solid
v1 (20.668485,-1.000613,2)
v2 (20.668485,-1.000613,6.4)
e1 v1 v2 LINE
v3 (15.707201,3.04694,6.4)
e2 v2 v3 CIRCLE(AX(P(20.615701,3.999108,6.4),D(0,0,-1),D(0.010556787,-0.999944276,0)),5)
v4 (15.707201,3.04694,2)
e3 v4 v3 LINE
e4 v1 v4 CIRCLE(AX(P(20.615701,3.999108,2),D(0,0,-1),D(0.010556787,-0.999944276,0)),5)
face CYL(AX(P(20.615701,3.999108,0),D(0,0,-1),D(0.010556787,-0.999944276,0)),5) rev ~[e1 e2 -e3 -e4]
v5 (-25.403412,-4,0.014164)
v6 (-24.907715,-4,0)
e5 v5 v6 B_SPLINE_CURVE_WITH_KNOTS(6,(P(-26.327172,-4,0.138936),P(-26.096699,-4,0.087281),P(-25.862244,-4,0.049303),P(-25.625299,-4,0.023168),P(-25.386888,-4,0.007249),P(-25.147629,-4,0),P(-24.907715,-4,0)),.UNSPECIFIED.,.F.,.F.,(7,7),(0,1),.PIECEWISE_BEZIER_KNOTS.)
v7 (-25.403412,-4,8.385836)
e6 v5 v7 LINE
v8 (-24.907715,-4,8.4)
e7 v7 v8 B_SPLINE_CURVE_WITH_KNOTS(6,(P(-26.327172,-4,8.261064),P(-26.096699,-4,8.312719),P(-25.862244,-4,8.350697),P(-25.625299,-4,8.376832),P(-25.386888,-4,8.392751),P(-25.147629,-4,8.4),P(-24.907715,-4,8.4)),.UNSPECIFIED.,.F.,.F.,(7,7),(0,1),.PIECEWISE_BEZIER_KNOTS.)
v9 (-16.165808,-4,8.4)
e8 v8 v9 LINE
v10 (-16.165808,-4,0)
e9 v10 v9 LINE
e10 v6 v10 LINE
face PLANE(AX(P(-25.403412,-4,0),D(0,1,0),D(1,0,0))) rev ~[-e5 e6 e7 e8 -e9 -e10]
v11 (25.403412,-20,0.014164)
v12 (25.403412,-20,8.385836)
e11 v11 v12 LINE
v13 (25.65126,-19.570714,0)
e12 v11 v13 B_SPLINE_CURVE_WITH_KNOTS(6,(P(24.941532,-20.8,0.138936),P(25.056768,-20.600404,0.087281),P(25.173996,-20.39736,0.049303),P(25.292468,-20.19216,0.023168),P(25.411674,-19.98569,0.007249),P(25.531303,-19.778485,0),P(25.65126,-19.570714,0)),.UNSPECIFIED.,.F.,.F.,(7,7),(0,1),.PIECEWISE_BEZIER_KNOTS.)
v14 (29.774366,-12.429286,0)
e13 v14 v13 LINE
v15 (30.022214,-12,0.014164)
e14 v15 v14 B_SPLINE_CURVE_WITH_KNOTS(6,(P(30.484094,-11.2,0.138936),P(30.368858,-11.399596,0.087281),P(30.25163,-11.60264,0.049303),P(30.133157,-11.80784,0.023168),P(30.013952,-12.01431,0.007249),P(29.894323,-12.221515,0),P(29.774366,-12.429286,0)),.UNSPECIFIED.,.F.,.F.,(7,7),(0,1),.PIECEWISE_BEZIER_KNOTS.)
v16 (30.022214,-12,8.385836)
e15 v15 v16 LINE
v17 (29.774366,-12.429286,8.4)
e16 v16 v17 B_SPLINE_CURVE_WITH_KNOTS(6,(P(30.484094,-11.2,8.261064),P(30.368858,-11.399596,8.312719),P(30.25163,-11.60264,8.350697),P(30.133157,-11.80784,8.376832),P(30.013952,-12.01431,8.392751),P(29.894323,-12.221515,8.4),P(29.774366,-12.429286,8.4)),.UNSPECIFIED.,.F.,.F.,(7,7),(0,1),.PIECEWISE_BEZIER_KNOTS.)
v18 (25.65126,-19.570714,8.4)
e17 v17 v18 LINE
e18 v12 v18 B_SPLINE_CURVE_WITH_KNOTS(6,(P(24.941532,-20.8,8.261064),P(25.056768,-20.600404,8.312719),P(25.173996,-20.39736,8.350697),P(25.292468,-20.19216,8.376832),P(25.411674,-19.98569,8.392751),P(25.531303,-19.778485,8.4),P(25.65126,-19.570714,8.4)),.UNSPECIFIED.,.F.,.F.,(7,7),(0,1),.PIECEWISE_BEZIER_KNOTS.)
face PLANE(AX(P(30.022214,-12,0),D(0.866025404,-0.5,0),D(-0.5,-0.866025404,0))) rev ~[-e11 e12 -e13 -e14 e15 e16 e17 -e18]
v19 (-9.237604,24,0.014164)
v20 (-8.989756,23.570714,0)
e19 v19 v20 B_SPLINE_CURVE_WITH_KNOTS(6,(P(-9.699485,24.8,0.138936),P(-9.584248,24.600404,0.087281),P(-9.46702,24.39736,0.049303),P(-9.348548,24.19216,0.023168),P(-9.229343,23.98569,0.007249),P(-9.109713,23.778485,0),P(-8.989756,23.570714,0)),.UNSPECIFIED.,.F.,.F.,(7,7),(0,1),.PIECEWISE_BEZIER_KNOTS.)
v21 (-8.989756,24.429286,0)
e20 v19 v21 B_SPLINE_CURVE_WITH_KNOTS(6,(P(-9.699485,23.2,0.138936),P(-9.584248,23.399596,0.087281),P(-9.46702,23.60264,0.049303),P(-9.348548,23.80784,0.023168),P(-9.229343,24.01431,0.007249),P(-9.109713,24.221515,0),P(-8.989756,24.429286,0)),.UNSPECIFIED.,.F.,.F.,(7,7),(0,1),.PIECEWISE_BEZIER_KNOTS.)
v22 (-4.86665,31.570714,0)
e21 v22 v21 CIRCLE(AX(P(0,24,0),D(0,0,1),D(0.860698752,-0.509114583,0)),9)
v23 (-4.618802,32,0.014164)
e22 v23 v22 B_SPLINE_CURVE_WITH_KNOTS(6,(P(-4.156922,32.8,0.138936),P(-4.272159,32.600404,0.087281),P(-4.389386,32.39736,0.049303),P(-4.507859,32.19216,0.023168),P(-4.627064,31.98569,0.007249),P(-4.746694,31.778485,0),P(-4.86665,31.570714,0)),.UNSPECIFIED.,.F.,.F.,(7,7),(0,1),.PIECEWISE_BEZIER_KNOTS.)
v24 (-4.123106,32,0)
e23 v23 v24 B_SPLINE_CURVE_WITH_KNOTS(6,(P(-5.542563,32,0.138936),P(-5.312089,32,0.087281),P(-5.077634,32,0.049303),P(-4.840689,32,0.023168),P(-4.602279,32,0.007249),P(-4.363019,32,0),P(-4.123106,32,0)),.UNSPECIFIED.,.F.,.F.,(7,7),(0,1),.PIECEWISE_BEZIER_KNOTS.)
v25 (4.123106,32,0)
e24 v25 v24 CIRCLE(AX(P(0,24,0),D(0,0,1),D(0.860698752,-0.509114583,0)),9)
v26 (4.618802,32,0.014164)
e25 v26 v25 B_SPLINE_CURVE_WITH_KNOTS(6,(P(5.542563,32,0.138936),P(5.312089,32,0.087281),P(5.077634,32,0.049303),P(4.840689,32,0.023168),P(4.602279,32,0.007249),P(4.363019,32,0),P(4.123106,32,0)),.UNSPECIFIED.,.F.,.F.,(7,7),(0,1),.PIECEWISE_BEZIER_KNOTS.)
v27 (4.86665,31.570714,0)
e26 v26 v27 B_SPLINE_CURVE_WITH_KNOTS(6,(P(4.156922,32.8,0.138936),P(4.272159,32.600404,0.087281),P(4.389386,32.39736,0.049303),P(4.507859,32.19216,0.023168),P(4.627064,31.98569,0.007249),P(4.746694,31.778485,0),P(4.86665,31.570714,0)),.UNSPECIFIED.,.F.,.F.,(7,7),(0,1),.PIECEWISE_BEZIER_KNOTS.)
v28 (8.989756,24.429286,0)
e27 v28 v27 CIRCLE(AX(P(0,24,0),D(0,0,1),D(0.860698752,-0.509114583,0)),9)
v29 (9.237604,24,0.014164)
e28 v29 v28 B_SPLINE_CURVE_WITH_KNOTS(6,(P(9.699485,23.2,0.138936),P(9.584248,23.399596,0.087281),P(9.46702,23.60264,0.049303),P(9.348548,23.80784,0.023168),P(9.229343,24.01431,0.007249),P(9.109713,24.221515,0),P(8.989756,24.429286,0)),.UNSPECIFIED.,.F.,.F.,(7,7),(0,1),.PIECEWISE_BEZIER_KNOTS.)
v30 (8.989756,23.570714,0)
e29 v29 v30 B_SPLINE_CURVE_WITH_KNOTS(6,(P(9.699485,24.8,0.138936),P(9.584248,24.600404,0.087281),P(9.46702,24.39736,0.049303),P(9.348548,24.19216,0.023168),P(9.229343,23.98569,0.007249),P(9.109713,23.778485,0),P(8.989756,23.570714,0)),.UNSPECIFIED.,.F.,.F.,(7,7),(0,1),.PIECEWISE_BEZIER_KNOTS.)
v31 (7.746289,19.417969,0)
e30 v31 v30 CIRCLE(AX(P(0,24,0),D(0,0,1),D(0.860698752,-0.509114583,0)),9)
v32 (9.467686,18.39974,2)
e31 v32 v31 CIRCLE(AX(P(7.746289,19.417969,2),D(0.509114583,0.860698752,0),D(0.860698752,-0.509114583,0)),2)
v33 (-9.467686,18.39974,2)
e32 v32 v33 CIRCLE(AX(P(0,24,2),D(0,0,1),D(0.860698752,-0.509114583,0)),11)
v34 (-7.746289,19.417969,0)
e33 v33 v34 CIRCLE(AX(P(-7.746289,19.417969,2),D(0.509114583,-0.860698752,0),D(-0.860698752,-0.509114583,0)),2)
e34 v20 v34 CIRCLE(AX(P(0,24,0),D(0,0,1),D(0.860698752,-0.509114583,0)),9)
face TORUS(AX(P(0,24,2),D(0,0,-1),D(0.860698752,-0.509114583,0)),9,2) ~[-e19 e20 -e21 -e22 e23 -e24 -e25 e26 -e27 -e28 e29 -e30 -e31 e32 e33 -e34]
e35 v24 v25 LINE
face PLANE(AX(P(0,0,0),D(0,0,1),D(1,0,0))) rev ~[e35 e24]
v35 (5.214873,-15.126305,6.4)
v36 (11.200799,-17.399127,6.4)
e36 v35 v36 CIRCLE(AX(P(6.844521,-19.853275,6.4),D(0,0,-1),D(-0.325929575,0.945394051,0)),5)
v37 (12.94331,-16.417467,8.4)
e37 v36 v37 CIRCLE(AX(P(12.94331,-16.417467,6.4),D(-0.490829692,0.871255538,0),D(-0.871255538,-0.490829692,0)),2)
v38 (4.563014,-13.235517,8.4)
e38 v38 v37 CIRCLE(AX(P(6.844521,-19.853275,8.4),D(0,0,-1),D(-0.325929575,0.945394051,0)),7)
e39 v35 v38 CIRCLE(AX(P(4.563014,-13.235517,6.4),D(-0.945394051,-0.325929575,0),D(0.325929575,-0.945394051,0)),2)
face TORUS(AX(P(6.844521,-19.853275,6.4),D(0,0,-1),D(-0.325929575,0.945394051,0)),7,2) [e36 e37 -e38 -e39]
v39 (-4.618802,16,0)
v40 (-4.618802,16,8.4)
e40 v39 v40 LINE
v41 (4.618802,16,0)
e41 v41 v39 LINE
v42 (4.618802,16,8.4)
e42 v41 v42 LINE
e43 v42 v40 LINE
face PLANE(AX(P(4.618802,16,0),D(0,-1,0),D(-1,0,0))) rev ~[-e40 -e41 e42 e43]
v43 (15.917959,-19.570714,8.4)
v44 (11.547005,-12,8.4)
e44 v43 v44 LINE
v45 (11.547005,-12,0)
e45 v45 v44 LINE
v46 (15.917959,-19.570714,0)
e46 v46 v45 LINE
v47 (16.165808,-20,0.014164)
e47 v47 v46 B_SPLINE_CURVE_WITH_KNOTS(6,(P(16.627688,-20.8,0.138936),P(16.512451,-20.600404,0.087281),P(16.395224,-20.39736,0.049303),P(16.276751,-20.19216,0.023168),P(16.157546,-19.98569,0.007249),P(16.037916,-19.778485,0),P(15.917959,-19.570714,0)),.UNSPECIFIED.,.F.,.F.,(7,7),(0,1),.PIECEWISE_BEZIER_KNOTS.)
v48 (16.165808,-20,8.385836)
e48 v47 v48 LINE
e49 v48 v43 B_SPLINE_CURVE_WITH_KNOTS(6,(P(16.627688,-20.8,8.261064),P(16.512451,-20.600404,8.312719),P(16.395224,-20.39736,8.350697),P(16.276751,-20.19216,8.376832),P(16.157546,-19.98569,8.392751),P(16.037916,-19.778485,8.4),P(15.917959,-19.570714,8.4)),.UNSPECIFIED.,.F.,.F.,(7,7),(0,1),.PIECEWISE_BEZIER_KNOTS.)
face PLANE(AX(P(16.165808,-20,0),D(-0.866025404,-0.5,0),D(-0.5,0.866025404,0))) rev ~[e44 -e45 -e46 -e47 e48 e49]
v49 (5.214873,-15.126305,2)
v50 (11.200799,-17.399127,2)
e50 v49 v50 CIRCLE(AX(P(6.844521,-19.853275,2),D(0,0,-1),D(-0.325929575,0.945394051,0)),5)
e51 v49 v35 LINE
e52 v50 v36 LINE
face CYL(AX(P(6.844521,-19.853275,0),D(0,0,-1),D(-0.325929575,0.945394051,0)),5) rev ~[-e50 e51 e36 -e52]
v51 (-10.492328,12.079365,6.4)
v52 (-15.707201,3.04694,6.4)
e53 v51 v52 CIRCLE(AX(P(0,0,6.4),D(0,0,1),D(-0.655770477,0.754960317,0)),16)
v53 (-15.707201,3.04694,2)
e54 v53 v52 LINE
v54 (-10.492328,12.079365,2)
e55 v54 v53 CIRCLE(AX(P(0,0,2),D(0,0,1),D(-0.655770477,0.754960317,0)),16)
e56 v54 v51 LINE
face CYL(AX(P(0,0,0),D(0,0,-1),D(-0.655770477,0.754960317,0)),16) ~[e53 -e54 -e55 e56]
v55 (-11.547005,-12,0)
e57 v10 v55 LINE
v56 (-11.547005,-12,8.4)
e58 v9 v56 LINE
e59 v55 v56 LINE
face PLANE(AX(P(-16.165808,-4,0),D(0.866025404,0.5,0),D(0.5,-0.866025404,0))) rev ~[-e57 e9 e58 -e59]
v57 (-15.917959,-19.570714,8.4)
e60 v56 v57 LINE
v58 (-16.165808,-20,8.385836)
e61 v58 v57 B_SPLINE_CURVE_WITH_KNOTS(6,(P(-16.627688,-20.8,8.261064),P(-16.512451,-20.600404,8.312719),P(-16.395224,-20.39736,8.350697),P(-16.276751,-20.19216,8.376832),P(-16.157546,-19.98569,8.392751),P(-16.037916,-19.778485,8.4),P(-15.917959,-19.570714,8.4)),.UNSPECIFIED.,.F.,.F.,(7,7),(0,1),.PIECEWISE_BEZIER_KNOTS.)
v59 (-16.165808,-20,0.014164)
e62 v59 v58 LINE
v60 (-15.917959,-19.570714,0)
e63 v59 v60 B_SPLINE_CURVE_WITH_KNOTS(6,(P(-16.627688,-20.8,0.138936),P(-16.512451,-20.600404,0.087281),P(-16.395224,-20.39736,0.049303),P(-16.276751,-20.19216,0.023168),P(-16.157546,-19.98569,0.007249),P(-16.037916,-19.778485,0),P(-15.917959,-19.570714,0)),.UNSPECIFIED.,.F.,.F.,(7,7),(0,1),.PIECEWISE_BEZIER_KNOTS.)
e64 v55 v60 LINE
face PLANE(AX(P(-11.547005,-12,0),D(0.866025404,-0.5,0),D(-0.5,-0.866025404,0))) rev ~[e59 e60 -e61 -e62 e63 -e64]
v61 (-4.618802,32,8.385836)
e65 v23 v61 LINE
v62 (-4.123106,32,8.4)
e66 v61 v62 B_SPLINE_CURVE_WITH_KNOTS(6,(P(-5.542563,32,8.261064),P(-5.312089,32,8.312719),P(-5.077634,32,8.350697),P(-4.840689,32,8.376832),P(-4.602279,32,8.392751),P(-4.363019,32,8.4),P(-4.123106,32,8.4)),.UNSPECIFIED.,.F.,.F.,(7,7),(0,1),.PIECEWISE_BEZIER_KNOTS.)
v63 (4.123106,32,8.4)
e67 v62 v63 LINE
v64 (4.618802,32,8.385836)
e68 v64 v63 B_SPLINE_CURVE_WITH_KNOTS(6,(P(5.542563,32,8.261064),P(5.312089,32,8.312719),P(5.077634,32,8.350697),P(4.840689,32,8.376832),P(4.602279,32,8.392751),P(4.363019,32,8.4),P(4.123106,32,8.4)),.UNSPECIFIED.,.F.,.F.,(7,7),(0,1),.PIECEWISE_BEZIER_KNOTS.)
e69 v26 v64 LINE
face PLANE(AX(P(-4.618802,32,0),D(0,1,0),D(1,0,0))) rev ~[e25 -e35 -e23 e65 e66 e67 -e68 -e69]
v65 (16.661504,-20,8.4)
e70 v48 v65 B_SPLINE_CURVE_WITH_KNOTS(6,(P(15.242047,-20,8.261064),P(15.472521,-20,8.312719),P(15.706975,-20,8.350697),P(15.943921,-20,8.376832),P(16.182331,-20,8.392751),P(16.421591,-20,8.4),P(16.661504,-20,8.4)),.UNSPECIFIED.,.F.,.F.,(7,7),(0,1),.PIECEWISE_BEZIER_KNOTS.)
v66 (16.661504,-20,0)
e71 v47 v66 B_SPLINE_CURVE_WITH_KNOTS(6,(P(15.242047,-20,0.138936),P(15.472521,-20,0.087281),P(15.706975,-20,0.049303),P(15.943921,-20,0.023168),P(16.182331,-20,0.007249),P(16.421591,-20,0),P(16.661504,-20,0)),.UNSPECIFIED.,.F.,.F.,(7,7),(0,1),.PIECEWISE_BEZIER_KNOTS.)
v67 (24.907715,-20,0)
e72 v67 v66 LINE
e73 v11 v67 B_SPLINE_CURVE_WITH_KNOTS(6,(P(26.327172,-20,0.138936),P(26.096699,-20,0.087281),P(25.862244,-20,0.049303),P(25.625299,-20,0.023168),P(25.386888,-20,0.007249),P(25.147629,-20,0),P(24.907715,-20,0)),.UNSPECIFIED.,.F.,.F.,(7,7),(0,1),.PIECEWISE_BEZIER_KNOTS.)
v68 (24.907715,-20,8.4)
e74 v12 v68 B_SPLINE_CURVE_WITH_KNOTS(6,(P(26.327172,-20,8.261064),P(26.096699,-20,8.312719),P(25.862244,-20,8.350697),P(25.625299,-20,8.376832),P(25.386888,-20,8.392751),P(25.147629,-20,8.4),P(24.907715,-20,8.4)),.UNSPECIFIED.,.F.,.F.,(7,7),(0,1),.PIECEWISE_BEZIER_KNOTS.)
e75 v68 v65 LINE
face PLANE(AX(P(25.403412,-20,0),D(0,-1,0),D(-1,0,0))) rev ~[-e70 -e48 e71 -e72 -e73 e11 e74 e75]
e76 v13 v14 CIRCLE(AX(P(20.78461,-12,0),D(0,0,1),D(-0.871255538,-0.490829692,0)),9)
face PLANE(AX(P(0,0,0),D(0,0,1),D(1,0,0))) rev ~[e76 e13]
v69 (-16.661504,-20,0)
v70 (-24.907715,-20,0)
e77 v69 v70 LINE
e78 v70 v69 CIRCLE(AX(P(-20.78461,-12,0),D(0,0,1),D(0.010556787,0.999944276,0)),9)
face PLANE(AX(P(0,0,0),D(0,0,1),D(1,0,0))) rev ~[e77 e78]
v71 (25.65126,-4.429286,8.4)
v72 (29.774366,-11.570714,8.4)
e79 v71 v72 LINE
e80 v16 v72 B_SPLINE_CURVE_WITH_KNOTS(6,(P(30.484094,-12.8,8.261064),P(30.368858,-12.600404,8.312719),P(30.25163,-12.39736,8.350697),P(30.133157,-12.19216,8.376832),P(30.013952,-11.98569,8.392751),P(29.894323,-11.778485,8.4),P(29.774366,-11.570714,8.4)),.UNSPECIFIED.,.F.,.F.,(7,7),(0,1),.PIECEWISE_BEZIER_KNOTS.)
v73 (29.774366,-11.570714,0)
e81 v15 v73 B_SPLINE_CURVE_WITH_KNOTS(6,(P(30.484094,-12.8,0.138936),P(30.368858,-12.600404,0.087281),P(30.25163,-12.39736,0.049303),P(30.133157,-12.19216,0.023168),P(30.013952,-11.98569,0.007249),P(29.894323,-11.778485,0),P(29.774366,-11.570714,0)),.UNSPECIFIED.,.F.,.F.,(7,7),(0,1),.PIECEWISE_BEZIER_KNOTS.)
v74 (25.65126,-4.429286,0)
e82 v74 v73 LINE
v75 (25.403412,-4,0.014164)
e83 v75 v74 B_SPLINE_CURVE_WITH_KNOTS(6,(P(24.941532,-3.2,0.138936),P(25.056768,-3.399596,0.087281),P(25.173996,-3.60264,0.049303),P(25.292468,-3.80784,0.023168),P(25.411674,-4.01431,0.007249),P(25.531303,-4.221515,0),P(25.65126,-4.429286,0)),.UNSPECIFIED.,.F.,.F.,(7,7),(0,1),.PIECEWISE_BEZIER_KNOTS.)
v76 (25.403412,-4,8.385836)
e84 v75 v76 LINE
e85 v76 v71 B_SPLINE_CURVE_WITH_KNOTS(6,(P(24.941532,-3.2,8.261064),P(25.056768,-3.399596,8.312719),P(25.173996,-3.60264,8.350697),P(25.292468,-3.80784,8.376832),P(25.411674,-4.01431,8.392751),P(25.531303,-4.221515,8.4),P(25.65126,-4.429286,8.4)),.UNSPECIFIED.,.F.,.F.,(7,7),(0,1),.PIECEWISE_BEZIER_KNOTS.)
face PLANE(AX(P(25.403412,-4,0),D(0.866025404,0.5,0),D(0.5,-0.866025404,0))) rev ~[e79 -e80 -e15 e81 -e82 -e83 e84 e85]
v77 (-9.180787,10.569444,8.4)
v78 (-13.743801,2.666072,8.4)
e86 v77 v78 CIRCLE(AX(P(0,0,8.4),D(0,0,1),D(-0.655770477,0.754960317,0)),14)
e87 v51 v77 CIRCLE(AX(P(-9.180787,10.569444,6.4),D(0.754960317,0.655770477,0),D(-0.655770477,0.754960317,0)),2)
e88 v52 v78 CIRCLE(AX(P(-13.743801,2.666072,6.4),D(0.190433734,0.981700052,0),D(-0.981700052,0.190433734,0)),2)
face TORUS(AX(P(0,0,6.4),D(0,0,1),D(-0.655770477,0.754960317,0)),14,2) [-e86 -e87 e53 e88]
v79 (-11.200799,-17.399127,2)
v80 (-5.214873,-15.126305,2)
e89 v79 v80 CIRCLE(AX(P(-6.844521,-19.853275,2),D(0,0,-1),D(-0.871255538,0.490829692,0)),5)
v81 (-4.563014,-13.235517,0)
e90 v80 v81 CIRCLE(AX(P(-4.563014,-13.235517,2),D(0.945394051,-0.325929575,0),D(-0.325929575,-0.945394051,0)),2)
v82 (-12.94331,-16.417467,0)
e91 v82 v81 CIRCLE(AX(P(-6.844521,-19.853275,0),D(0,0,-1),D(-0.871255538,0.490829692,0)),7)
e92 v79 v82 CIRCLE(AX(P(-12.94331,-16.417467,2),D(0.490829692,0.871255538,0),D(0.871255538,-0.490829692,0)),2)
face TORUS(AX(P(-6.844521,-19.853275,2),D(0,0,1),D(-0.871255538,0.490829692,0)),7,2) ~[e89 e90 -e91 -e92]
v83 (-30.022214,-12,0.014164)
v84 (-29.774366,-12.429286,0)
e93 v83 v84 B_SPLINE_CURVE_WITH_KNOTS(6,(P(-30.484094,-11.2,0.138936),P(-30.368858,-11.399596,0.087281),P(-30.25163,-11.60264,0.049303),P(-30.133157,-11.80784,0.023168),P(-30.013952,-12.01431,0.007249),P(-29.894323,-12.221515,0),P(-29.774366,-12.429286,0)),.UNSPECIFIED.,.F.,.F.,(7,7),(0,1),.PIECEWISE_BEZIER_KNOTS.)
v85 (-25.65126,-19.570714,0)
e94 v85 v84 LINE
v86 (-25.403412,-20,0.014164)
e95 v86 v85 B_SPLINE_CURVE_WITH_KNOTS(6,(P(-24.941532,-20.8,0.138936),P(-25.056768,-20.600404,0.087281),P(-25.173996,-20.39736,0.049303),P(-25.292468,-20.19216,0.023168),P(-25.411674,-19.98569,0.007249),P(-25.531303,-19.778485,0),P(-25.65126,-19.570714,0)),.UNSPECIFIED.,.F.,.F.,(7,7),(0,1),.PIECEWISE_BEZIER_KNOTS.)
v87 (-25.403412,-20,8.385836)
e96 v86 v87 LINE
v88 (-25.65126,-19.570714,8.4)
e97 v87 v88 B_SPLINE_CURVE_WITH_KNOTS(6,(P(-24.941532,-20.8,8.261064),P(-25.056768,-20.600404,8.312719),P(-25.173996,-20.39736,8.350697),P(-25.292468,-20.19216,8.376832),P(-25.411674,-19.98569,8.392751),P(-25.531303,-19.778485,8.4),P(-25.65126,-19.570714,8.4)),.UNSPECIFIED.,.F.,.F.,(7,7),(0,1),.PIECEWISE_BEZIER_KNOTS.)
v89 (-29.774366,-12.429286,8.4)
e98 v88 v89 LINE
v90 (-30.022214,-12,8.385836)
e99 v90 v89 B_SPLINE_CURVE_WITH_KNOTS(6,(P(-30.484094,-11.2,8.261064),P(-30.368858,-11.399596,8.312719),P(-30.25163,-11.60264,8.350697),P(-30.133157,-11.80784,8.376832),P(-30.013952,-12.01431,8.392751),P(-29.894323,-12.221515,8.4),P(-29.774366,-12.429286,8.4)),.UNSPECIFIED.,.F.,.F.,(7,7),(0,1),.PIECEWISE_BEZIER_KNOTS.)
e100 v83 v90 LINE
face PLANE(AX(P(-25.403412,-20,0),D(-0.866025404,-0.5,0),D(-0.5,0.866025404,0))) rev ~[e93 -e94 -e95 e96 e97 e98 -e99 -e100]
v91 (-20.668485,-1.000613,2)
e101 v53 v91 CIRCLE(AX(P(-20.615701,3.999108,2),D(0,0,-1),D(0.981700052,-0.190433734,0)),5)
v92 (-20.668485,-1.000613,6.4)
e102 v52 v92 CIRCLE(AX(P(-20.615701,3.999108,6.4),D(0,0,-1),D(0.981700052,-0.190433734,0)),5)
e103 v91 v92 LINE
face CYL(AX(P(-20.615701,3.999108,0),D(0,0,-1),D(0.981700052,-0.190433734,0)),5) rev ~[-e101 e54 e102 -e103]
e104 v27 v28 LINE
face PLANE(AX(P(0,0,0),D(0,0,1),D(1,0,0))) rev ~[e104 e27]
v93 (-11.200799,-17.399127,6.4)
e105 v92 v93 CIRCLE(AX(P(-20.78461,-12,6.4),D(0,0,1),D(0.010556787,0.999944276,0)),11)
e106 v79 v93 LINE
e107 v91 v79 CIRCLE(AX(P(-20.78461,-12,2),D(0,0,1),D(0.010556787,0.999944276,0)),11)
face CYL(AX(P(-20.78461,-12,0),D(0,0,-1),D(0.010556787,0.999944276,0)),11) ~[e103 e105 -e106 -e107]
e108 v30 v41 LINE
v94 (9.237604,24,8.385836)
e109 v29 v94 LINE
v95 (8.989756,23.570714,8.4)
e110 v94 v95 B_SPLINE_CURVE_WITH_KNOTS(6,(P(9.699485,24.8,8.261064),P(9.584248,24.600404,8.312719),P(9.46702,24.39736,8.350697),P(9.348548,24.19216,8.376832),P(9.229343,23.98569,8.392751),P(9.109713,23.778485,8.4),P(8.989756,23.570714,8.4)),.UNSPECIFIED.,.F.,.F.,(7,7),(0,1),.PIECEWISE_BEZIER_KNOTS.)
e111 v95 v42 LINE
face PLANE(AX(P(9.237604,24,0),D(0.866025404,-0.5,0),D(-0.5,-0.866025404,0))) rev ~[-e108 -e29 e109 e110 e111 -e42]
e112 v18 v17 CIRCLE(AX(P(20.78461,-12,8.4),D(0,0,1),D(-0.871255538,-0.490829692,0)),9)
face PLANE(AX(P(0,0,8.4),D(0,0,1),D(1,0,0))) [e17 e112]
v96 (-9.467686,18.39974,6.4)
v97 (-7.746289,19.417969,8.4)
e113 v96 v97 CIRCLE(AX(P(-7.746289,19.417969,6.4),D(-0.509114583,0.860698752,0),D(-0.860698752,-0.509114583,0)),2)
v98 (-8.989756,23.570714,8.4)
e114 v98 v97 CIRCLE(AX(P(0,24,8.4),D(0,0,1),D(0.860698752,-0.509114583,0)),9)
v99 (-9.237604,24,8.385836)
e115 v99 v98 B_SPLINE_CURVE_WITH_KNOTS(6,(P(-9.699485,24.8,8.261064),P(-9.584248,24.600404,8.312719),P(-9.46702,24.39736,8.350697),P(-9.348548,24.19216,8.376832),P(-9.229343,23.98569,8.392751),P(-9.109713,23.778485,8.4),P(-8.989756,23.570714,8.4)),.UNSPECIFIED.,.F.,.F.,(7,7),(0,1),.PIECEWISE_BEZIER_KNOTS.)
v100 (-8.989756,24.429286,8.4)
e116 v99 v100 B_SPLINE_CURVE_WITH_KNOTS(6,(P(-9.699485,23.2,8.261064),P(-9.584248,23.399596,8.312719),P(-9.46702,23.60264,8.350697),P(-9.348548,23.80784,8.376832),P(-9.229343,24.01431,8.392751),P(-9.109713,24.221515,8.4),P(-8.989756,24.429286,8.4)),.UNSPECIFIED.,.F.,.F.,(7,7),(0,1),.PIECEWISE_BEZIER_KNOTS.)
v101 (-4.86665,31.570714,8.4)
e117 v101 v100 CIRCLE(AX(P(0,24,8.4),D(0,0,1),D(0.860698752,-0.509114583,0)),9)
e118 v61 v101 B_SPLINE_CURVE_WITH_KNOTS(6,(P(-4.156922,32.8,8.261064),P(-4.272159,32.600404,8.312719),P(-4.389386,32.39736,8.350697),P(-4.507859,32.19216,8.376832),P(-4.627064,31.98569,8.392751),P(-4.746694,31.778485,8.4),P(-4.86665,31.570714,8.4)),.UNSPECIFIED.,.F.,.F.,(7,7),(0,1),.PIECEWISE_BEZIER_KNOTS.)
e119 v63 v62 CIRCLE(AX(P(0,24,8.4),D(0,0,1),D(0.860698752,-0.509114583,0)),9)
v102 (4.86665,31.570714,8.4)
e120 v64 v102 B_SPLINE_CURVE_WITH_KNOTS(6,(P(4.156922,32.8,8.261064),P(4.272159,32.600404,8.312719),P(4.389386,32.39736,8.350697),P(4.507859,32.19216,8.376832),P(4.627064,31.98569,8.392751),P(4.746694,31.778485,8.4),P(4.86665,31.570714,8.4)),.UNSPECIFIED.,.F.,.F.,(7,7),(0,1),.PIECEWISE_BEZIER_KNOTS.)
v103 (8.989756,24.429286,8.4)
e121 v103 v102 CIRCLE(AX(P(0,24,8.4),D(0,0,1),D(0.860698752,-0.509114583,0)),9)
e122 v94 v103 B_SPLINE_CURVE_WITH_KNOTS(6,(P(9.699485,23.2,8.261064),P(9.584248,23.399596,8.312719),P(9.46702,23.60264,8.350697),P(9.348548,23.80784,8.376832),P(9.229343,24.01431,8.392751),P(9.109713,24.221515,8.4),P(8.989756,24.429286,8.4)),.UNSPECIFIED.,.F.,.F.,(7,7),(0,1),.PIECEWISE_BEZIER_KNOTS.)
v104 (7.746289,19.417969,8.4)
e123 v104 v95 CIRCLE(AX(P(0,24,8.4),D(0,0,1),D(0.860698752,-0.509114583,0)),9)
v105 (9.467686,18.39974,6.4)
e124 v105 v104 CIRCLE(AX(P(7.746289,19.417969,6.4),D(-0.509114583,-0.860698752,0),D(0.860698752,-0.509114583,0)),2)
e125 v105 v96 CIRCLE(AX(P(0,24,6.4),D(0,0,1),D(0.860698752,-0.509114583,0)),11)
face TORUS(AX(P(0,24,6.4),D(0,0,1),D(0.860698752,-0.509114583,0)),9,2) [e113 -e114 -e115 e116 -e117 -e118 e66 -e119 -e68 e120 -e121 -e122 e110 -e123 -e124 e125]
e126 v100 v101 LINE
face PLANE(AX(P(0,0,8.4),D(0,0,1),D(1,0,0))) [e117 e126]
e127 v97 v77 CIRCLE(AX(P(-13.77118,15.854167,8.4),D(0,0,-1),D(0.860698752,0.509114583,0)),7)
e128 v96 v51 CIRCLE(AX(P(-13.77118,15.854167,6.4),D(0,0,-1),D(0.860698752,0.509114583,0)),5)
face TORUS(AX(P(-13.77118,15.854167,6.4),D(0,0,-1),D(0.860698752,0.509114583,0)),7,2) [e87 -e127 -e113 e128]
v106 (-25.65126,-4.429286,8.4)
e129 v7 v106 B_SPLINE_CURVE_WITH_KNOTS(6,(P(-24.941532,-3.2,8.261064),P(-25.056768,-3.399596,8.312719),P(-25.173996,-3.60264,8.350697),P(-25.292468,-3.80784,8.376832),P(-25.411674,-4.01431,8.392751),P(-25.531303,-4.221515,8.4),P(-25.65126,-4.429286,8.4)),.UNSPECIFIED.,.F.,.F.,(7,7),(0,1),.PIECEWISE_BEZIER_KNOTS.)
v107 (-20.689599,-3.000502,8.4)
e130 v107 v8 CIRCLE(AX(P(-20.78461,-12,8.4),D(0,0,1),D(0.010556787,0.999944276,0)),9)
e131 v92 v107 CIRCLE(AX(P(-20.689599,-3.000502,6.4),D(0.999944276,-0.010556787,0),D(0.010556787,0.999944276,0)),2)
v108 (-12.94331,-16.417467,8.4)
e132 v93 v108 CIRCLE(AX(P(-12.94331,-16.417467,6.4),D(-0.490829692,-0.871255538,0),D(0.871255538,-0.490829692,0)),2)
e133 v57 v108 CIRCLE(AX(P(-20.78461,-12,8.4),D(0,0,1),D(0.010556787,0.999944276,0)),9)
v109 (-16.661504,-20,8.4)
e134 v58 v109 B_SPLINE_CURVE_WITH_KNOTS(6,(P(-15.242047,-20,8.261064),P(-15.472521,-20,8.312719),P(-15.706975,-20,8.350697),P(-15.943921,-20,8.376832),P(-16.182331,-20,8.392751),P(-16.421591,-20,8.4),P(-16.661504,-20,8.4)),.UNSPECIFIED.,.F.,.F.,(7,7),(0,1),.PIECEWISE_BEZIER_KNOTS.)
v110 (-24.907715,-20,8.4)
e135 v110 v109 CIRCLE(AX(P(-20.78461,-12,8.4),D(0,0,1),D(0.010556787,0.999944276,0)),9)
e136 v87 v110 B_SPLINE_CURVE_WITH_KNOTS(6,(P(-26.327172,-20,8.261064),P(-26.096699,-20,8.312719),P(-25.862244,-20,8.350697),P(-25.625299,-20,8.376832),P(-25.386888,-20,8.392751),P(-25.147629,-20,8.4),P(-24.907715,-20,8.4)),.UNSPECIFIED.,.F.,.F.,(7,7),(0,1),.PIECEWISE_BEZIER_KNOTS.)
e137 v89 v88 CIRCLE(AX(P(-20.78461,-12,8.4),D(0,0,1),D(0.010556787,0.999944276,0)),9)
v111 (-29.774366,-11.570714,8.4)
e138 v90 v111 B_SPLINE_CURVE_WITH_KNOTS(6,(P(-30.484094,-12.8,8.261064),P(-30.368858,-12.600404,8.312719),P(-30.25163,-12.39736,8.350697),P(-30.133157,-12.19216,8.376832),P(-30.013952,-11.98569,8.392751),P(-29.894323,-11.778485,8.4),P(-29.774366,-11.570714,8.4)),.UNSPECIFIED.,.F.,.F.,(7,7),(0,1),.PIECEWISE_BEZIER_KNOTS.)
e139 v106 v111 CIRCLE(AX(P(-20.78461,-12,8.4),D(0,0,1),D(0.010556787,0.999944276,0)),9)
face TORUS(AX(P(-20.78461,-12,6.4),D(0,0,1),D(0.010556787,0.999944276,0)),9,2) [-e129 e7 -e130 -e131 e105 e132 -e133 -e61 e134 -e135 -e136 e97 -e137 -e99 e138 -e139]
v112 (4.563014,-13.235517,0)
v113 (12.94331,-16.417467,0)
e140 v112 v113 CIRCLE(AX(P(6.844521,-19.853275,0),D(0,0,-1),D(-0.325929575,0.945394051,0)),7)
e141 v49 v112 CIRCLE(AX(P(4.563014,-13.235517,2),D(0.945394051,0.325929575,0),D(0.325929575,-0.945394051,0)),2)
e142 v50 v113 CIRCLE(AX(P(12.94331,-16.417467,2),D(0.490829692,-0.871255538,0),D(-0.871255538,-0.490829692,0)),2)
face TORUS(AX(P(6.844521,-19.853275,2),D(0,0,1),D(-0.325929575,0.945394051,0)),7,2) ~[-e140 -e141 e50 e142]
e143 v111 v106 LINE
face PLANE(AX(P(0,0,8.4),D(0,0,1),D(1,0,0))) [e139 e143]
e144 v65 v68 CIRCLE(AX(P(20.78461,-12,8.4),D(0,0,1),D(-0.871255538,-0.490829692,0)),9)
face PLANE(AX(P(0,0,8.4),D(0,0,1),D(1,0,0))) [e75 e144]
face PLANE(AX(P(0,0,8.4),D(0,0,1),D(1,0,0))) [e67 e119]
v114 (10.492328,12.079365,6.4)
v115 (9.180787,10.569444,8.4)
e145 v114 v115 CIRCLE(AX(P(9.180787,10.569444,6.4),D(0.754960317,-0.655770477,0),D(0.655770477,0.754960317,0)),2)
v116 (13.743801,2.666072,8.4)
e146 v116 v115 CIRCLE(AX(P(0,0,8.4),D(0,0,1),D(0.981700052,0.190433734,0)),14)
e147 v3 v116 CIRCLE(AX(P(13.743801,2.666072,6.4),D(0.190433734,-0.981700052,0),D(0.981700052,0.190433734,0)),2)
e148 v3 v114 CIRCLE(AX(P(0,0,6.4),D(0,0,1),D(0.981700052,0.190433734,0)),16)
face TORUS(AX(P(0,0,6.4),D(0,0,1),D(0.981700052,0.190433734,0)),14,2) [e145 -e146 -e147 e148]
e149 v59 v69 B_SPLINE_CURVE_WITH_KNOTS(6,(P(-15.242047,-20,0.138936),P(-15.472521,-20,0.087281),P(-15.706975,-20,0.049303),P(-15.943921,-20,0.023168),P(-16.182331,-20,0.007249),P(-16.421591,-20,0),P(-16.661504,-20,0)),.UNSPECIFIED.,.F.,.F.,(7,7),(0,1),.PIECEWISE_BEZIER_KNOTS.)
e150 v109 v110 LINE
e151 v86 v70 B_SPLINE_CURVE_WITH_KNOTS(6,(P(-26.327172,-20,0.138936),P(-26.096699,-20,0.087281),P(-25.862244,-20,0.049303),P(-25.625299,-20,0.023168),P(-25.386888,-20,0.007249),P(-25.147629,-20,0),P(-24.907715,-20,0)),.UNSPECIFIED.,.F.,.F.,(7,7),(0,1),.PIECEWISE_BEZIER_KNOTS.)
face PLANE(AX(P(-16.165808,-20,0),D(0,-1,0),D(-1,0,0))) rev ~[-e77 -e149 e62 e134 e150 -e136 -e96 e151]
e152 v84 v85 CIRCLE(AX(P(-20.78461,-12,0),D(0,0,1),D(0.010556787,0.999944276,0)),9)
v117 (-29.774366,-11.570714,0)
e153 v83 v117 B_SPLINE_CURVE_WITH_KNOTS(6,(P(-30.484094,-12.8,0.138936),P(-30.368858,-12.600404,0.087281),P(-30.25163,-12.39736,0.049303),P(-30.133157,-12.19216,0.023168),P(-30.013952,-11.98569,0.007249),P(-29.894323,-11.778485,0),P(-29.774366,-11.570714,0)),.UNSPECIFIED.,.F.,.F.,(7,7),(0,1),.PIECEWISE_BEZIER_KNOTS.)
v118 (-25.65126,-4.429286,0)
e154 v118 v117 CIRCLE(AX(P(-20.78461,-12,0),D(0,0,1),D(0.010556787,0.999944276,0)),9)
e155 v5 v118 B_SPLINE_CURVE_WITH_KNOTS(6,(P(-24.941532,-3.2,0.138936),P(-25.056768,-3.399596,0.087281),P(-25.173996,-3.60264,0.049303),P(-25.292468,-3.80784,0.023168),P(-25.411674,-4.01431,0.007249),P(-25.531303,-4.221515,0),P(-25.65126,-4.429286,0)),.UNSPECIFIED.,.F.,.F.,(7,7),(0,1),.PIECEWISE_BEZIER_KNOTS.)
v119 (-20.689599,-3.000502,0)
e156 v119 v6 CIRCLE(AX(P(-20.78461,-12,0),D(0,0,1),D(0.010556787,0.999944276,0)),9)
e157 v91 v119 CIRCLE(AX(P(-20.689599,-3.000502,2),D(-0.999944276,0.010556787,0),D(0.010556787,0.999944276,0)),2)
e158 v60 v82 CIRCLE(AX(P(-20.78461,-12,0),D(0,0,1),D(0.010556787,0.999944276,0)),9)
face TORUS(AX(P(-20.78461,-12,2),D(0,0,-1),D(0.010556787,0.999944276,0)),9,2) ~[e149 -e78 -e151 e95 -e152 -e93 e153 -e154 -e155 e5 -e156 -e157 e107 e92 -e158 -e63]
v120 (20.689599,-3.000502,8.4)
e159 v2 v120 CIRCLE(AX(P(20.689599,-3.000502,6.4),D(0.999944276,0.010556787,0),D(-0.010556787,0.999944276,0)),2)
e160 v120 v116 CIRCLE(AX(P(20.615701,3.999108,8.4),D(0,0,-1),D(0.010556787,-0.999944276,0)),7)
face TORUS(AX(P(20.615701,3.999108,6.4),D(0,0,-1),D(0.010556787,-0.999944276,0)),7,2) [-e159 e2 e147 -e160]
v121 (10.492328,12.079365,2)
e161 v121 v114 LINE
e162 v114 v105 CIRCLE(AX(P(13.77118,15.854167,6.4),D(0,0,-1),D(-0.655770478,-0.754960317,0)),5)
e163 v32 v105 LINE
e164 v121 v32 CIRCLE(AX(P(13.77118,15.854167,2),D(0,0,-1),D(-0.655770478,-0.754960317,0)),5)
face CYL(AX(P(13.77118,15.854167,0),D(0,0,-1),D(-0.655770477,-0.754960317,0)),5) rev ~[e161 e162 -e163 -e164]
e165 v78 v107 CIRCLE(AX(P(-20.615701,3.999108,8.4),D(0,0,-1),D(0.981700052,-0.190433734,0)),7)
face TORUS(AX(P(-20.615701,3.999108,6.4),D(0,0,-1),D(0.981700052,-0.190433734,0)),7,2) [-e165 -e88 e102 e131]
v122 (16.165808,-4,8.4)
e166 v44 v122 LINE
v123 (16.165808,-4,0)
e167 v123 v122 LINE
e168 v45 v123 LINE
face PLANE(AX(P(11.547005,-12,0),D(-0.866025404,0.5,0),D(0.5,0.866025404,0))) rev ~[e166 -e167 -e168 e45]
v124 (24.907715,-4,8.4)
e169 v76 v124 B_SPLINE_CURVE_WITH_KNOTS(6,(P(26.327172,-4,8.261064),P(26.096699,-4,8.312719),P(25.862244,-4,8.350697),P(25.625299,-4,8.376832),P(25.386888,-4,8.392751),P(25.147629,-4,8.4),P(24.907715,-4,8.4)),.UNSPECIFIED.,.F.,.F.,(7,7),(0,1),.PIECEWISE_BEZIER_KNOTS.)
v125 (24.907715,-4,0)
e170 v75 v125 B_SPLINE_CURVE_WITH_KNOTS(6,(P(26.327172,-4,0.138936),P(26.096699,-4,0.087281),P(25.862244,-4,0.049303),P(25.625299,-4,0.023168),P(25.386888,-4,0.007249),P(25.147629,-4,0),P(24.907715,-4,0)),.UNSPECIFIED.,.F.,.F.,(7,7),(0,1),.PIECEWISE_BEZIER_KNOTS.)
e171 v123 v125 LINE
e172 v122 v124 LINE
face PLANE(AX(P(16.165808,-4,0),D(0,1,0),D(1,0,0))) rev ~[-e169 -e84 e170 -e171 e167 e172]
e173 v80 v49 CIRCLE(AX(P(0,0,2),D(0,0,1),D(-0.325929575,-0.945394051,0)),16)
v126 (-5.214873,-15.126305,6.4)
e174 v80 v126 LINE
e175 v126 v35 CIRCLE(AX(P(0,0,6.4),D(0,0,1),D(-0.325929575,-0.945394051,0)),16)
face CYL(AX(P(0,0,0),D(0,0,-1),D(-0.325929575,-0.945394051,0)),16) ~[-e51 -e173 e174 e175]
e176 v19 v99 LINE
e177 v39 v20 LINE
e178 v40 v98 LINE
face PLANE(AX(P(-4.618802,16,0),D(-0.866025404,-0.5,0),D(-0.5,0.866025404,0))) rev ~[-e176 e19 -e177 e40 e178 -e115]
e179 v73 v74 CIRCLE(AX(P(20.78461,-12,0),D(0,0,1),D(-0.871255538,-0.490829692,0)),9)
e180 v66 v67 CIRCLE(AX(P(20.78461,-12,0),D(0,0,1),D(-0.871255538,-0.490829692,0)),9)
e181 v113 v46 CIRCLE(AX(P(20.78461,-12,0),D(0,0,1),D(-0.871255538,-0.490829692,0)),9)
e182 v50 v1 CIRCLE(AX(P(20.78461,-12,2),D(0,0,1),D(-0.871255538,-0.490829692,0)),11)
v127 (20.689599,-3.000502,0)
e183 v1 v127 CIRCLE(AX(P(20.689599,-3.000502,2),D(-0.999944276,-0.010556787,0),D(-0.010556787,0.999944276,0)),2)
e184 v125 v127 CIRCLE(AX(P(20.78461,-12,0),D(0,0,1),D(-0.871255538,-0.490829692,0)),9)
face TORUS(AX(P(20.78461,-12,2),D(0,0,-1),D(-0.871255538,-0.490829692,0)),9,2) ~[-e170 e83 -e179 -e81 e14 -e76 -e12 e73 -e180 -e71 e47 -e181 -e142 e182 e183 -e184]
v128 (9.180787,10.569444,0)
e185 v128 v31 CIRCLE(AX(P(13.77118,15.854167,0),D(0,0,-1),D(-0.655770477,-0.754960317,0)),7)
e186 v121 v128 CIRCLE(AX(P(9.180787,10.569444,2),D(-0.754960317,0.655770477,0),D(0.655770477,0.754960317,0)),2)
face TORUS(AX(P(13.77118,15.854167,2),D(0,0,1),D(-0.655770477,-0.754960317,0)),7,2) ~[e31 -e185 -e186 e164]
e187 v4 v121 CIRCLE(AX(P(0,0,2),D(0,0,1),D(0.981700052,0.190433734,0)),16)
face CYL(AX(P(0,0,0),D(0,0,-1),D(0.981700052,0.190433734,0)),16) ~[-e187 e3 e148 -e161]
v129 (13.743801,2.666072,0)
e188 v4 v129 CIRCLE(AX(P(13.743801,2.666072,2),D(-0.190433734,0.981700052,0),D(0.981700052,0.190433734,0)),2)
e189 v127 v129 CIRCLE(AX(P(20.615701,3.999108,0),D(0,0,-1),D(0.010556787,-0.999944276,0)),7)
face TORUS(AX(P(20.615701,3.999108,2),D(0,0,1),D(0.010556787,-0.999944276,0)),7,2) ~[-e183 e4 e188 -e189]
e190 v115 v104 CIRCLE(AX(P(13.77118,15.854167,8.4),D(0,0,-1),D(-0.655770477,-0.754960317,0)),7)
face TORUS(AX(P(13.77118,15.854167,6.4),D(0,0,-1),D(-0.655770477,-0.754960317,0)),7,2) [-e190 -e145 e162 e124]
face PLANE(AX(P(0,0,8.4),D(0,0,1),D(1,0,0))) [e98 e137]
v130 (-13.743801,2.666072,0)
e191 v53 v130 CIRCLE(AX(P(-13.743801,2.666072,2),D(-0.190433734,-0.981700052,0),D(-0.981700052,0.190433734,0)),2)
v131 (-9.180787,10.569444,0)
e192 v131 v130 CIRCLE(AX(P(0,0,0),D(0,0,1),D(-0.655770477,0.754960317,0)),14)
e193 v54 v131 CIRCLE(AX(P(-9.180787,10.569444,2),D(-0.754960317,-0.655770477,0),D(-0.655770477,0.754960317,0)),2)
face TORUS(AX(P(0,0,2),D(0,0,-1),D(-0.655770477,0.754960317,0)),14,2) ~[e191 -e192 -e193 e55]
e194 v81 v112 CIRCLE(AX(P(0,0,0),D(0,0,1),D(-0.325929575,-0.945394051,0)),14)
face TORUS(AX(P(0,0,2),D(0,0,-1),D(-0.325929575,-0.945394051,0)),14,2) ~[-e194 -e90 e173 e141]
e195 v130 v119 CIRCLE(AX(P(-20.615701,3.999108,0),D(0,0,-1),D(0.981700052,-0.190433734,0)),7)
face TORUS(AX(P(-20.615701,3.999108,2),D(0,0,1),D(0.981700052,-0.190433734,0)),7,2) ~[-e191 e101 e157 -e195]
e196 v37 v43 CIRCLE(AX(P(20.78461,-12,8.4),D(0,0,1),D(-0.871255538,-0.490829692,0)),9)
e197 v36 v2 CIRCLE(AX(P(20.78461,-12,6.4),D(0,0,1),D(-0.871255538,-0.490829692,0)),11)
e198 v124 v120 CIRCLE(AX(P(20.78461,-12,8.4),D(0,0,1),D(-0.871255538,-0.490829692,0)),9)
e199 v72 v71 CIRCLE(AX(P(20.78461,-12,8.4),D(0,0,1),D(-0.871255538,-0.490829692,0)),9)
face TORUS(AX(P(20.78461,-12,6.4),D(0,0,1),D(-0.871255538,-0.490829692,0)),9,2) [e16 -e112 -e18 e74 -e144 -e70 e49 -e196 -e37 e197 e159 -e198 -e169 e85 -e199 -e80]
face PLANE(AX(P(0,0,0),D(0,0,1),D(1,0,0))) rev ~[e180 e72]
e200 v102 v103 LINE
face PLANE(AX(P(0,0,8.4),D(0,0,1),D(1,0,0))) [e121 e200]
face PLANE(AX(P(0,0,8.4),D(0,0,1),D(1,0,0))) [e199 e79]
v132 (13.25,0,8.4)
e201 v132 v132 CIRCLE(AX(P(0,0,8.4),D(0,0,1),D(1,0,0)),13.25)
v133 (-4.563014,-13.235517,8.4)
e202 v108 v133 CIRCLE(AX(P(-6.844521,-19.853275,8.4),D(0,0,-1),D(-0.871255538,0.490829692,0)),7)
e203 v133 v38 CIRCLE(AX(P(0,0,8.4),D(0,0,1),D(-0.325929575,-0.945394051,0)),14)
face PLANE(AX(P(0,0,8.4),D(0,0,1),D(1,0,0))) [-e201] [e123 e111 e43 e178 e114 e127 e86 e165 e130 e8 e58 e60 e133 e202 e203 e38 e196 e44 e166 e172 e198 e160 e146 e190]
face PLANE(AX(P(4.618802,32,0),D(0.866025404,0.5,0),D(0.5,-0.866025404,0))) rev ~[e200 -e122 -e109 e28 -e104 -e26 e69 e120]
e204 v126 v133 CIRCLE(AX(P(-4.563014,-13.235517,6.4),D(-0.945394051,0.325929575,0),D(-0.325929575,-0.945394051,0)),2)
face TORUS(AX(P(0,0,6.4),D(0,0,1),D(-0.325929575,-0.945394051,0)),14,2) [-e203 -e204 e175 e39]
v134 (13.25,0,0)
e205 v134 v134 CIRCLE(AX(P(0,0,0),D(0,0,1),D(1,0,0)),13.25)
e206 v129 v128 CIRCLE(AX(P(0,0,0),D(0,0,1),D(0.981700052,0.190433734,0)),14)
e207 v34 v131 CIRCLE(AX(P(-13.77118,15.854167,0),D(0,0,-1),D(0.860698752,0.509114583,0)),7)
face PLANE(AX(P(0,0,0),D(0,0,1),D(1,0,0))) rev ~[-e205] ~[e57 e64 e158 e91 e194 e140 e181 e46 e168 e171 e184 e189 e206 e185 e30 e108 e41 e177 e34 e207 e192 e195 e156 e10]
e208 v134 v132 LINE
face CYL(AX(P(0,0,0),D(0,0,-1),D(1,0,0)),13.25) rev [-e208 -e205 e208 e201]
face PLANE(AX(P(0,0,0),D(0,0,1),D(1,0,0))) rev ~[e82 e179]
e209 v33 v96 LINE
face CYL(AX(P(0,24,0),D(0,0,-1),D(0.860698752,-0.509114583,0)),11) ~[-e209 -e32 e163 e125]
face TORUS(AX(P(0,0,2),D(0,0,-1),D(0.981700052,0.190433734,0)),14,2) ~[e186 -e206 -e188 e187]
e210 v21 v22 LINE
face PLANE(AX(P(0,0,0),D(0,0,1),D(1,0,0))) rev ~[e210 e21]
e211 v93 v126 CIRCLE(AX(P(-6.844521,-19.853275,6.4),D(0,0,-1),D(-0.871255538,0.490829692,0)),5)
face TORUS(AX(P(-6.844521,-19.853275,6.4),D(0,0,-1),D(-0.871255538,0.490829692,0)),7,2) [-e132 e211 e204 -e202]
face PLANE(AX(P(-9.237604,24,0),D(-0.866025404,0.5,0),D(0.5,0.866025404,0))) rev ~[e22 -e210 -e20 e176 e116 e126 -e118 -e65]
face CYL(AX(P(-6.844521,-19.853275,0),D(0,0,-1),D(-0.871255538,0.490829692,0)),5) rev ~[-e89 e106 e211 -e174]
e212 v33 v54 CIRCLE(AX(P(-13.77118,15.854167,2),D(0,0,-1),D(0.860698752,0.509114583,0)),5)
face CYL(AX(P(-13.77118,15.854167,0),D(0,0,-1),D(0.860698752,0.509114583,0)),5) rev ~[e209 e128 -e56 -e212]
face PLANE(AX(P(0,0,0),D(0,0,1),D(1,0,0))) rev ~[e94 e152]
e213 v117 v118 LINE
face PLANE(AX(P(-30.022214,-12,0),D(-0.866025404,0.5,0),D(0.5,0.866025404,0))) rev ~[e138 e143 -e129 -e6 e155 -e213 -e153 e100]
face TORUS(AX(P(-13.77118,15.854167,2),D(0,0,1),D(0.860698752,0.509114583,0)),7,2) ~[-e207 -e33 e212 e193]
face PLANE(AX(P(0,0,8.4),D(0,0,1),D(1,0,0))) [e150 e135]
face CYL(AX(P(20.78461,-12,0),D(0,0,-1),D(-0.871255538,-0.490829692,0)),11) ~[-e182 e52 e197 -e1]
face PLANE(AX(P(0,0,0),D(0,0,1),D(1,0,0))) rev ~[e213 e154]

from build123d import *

# Parameters (mm, degrees)
F0_R         = 13.25
F1_DEPTH     = 8.4
F2_T2_ANGLE  = 241.2097411279
F2_T4_ANGLE  = 241.2097411279
F2_T6_ANGLE  = 38.0438050379
F2_T8_ANGLE  = 38.0438050379
F2_T10_ANGLE = 79.6267730829
F2_T12_ANGLE = 79.6267730829
F2_T14_ANGLE = 241.2097411279
F2_T16_ANGLE = 241.2097411279
F2_T18_ANGLE = 79.6267730829
F2_T20_ANGLE = 79.6267730829
F2_T22_ANGLE = 38.0438050379
F2_T24_ANGLE = 38.0438050379
F2_T26_ANGLE = 79.6267730829
F2_T28_ANGLE = 79.6267730829
F2_T30_ANGLE = 241.2097411279
F2_T32_ANGLE = 241.2097411279
F2_T34_ANGLE = 79.6267730829
F2_T36_ANGLE = 79.6267730829
F2_T38_ANGLE = 38.0438050379
F2_T40_ANGLE = 38.0438050379
F2_T42_ANGLE = 79.6267730829
F2_T44_ANGLE = 79.6267730829
F2_T46_ANGLE = 79.6267730829
F2_T48_ANGLE = 79.6267730829


# Not quite as in the source:
# - a fillet or chamfer that OpenCascade refuses, or shapes differently, is made with other operations: its cross-section is extruded or revolved along the edge and cut away or added


with BuildPart() as f1:
    # F0 (on Top) → F1 (new body)
    with BuildSketch(Plane.XY):
        with BuildLine():
            ThreePointArc((-11.2007987683, -17.3991266146), (-8.6193611443, -15.1788828445), (-5.2148732009, -15.1263048197))
            ThreePointArc((-5.2148732009, -15.1263048197), (0, -16), (5.2148732009, -15.1263048197))
            ThreePointArc((5.2148732009, -15.1263048197), (8.6193611443, -15.1788828445), (11.2007987683, -17.3991266146))
            ThreePointArc((11.2007987683, -17.3991266146), (30.3108891325, -17.5), (20.6684850361, -1.0006129687))
            ThreePointArc((20.6684850361, -1.0006129687), (17.4549787165, 0.1248557069), (15.7072008397, 3.0469397403))
            ThreePointArc((15.7072008397, 3.0469397403), (13.8564064606, 8), (10.4923276388, 12.0793650794))
            ThreePointArc((10.4923276388, 12.0793650794), (8.8356175722, 15.0540271376), (9.4676862678, 18.3997395833))
            ThreePointArc((9.4676862678, 18.3997395833), (0, 35), (-9.4676862678, 18.3997395833))
            ThreePointArc((-9.4676862678, 18.3997395833), (-8.8356175722, 15.0540271376), (-10.4923276388, 12.0793650794))
            ThreePointArc((-10.4923276388, 12.0793650794), (-13.8564064606, 8), (-15.7072008397, 3.0469397403))
            ThreePointArc((-15.7072008397, 3.0469397403), (-17.4549787165, 0.1248557069), (-20.6684850361, -1.0006129687))
            ThreePointArc((-20.6684850361, -1.0006129687), (-30.3108891325, -17.5), (-11.2007987683, -17.3991266146))
        make_face()
        Polygon((-16.1658075373, -20), (-25.4034118443, -20), (-30.0222139979, -12), (-25.4034118443, -4), (-16.1658075373, -4), (-11.5470053838, -12), align=None, mode=Mode.SUBTRACT)
        Polygon((25.4034118443, -4), (30.0222139979, -12), (25.4034118443, -20), (16.1658075373, -20), (11.5470053838, -12), (16.1658075373, -4), align=None, mode=Mode.SUBTRACT)
        Circle(F0_R, mode=Mode.SUBTRACT)
        Polygon((9.237604307, 24), (4.6188021535, 16), (-4.6188021535, 16), (-9.237604307, 24), (-4.6188021535, 32), (4.6188021535, 32), align=None, mode=Mode.SUBTRACT)
    extrude(amount=F1_DEPTH)

    # F2: fillet of radius 2 on 24 edges, made by hand

    # F2_s1 → F2_t2 (revolve, cut)
    with BuildSketch(Plane(origin=(10.5166628713, 17.7792561849, 0), x_dir=(0, 0, 1), z_dir=(-0.5091145833, -0.8606987516, 0))):
        with BuildLine():
            ThreePointArc((6.4, 1.21875), (7.8142135624, 1.8045364376), (8.4, 3.21875))
            Line((8.4, 3.21875), (8.4, 1.21875))
            Line((8.4, 1.21875), (6.4, 1.21875))
        make_face()
    revolve(axis=Axis((0, 24, 8.4), (0, 0, 1)), revolution_arc=F2_T2_ANGLE, mode=Mode.SUBTRACT)

    # F2_s3 → F2_t4 (revolve, cut)
    with BuildSketch(Plane(origin=(10.5166628713, 17.7792561849, 0), x_dir=(0, 0, 1), z_dir=(-0.5091145833, -0.8606987516, 0))):
        with BuildLine():
            ThreePointArc((2, 1.21875), (0.5857864376, 1.8045364376), (0, 3.21875))
            Line((0, 3.21875), (0, 1.21875))
            Line((0, 1.21875), (2, 1.21875))
        make_face()
    revolve(axis=Axis((0, 24, 0), (0, 0, 1)), revolution_arc=F2_T4_ANGLE, mode=Mode.SUBTRACT)

    # F2_s5 → F2_t6 (revolve, cut)
    with BuildSketch(Plane(origin=(0, 0, 0), x_dir=(0, 0, 1), z_dir=(0.7549603175, 0.6557704774, 0))):
        with BuildLine():
            ThreePointArc((2, -16), (0.5857864376, -15.4142135624), (0, -14))
            Line((0, -14), (0, -16))
            Line((0, -16), (2, -16))
        make_face()
    revolve(axis=Axis((0, 0, 0), (0, 0, 1)), revolution_arc=F2_T6_ANGLE, mode=Mode.SUBTRACT)

    # F2_s7 → F2_t8 (revolve, cut)
    with BuildSketch(Plane(origin=(0, 0, 0), x_dir=(0, 0, 1), z_dir=(0.7549603175, 0.6557704774, 0))):
        with BuildLine():
            ThreePointArc((6.4, -16), (7.8142135624, -15.4142135624), (8.4, -14))
            Line((8.4, -14), (8.4, -16))
            Line((8.4, -16), (6.4, -16))
        make_face()
    revolve(axis=Axis((0, 0, 8.4), (0, 0, 1)), revolution_arc=F2_T8_ANGLE, mode=Mode.SUBTRACT)

    # F2_s9 → F2_t10 (revolve, cut)
    with BuildSketch(Plane(origin=(0, 0, 0), x_dir=(0, 0, 1), z_dir=(0.1904337338, 0.9817000525, 0))):
        with BuildLine():
            ThreePointArc((2, -16), (0.5857864376, -15.4142135624), (0, -14))
            Line((0, -14), (0, -16))
            Line((0, -16), (2, -16))
        make_face()
    revolve(axis=Axis((-20.6157011021, 3.9991084092, 0), (0, 0, -1)), revolution_arc=F2_T10_ANGLE, mode=Mode.SUBTRACT)

    # F2_s11 → F2_t12 (revolve, cut)
    with BuildSketch(Plane(origin=(0, 0, 0), x_dir=(0, 0, 1), z_dir=(0.1904337338, 0.9817000525, 0))):
        with BuildLine():
            ThreePointArc((6.4, -16), (7.8142135624, -15.4142135624), (8.4, -14))
            Line((8.4, -14), (8.4, -16))
            Line((8.4, -16), (6.4, -16))
        make_face()
    revolve(axis=Axis((-20.6157011021, 3.9991084092, 8.4), (0, 0, -1)), revolution_arc=F2_T12_ANGLE, mode=Mode.SUBTRACT)

    # F2_s13 → F2_t14 (revolve, cut)
    with BuildSketch(Plane(origin=(-20.6556189522, 0.2180691172, 0), x_dir=(0, 0, 1), z_dir=(0.9999442756, -0.0105567868, 0))):
        with BuildLine():
            ThreePointArc((2, 1.21875), (0.5857864376, 1.8045364376), (0, 3.21875))
            Line((0, 3.21875), (0, 1.21875))
            Line((0, 1.21875), (2, 1.21875))
        make_face()
    revolve(axis=Axis((-20.7846096908, -12, 0), (0, 0, 1)), revolution_arc=F2_T14_ANGLE, mode=Mode.SUBTRACT)

    # F2_s15 → F2_t16 (revolve, cut)
    with BuildSketch(Plane(origin=(-20.6556189522, 0.2180691172, 0), x_dir=(0, 0, 1), z_dir=(0.9999442756, -0.0105567868, 0))):
        with BuildLine():
            ThreePointArc((6.4, 1.21875), (7.8142135624, 1.8045364376), (8.4, 3.21875))
            Line((8.4, 3.21875), (8.4, 1.21875))
            Line((8.4, 1.21875), (6.4, 1.21875))
        make_face()
    revolve(axis=Axis((-20.7846096908, -12, 8.4), (0, 0, 1)), revolution_arc=F2_T16_ANGLE, mode=Mode.SUBTRACT)

    # F2_s17 → F2_t18 (revolve, cut)
    with BuildSketch(Plane(origin=(-10.1389560808, -17.9973253021, 0), x_dir=(0, 0, 1), z_dir=(-0.4908296922, -0.8712555384, 0))):
        with BuildLine():
            ThreePointArc((2, 1.21875), (0.5857864376, 1.8045364376), (0, 3.21875))
            Line((0, 3.21875), (0, 1.21875))
            Line((0, 1.21875), (2, 1.21875))
        make_face()
    revolve(axis=Axis((-6.8445210762, -19.8532750758, 0), (0, 0, -1)), revolution_arc=F2_T18_ANGLE, mode=Mode.SUBTRACT)

    # F2_s19 → F2_t20 (revolve, cut)
    with BuildSketch(Plane(origin=(-10.1389560808, -17.9973253021, 0), x_dir=(0, 0, 1), z_dir=(-0.4908296922, -0.8712555384, 0))):
        with BuildLine():
            ThreePointArc((6.4, 1.21875), (7.8142135624, 1.8045364376), (8.4, 3.21875))
            Line((8.4, 3.21875), (8.4, 1.21875))
            Line((8.4, 1.21875), (6.4, 1.21875))
        make_face()
    revolve(axis=Axis((-6.8445210762, -19.8532750758, 8.4), (0, 0, -1)), revolution_arc=F2_T20_ANGLE, mode=Mode.SUBTRACT)

    # F2_s21 → F2_t22 (revolve, cut)
    with BuildSketch(Plane(origin=(0, 0, 0), x_dir=(0, 0, 1), z_dir=(-0.9453940512, 0.3259295751, 0))):
        with BuildLine():
            ThreePointArc((2, -16), (0.5857864376, -15.4142135624), (0, -14))
            Line((0, -14), (0, -16))
            Line((0, -16), (2, -16))
        make_face()
    revolve(axis=Axis((0, 0, 0), (0, 0, 1)), revolution_arc=F2_T22_ANGLE, mode=Mode.SUBTRACT)

    # F2_s23 → F2_t24 (revolve, cut)
    with BuildSketch(Plane(origin=(0, 0, 0), x_dir=(0, 0, 1), z_dir=(-0.9453940512, 0.3259295751, 0))):
        with BuildLine():
            ThreePointArc((6.4, -16), (7.8142135624, -15.4142135624), (8.4, -14))
            Line((8.4, -14), (8.4, -16))
            Line((8.4, -16), (6.4, -16))
        make_face()
    revolve(axis=Axis((0, 0, 8.4), (0, 0, 1)), revolution_arc=F2_T24_ANGLE, mode=Mode.SUBTRACT)

    # F2_s25 → F2_t26 (revolve, cut)
    with BuildSketch(Plane(origin=(0, 0, 0), x_dir=(0, 0, 1), z_dir=(-0.9453940512, -0.3259295751, 0))):
        with BuildLine():
            ThreePointArc((2, -16), (0.5857864376, -15.4142135624), (0, -14))
            Line((0, -14), (0, -16))
            Line((0, -16), (2, -16))
        make_face()
    revolve(axis=Axis((6.8445210762, -19.8532750758, 0), (0, 0, -1)), revolution_arc=F2_T26_ANGLE, mode=Mode.SUBTRACT)

    # F2_s27 → F2_t28 (revolve, cut)
    with BuildSketch(Plane(origin=(0, 0, 0), x_dir=(0, 0, 1), z_dir=(-0.9453940512, -0.3259295751, 0))):
        with BuildLine():
            ThreePointArc((6.4, -16), (7.8142135624, -15.4142135624), (8.4, -14))
            Line((8.4, -14), (8.4, -16))
            Line((8.4, -16), (6.4, -16))
        make_face()
    revolve(axis=Axis((6.8445210762, -19.8532750758, 8.4), (0, 0, -1)), revolution_arc=F2_T28_ANGLE, mode=Mode.SUBTRACT)

    # F2_s29 → F2_t30 (revolve, cut)
    with BuildSketch(Plane(origin=(10.1389560808, -17.9973253021, 0), x_dir=(0, 0, 1), z_dir=(-0.4908296922, 0.8712555384, 0))):
        with BuildLine():
            ThreePointArc((2, 1.21875), (0.5857864376, 1.8045364376), (0, 3.21875))
            Line((0, 3.21875), (0, 1.21875))
            Line((0, 1.21875), (2, 1.21875))
        make_face()
    revolve(axis=Axis((20.7846096908, -12, 0), (0, 0, 1)), revolution_arc=F2_T30_ANGLE, mode=Mode.SUBTRACT)

    # F2_s31 → F2_t32 (revolve, cut)
    with BuildSketch(Plane(origin=(10.1389560808, -17.9973253021, 0), x_dir=(0, 0, 1), z_dir=(-0.4908296922, 0.8712555384, 0))):
        with BuildLine():
            ThreePointArc((6.4, 1.21875), (7.8142135624, 1.8045364376), (8.4, 3.21875))
            Line((8.4, 3.21875), (8.4, 1.21875))
            Line((8.4, 1.21875), (6.4, 1.21875))
        make_face()
    revolve(axis=Axis((20.7846096908, -12, 8.4), (0, 0, 1)), revolution_arc=F2_T32_ANGLE, mode=Mode.SUBTRACT)

    # F2_s33 → F2_t34 (revolve, cut)
    with BuildSketch(Plane(origin=(20.6556189522, 0.2180691172, 0), x_dir=(0, 0, 1), z_dir=(0.9999442756, 0.0105567868, 0))):
        with BuildLine():
            ThreePointArc((2, 1.21875), (0.5857864376, 1.8045364376), (0, 3.21875))
            Line((0, 3.21875), (0, 1.21875))
            Line((0, 1.21875), (2, 1.21875))
        make_face()
    revolve(axis=Axis((20.6157011021, 3.9991084092, 0), (0, 0, -1)), revolution_arc=F2_T34_ANGLE, mode=Mode.SUBTRACT)

    # F2_s35 → F2_t36 (revolve, cut)
    with BuildSketch(Plane(origin=(20.6556189522, 0.2180691172, 0), x_dir=(0, 0, 1), z_dir=(0.9999442756, 0.0105567868, 0))):
        with BuildLine():
            ThreePointArc((6.4, 1.21875), (7.8142135624, 1.8045364376), (8.4, 3.21875))
            Line((8.4, 3.21875), (8.4, 1.21875))
            Line((8.4, 1.21875), (6.4, 1.21875))
        make_face()
    revolve(axis=Axis((20.6157011021, 3.9991084092, 8.4), (0, 0, -1)), revolution_arc=F2_T36_ANGLE, mode=Mode.SUBTRACT)

    # F2_s37 → F2_t38 (revolve, cut)
    with BuildSketch(Plane(origin=(0, 0, 0), x_dir=(0, 0, 1), z_dir=(0.1904337338, -0.9817000525, 0))):
        with BuildLine():
            ThreePointArc((2, -16), (0.5857864376, -15.4142135624), (0, -14))
            Line((0, -14), (0, -16))
            Line((0, -16), (2, -16))
        make_face()
    revolve(axis=Axis((0, 0, 0), (0, 0, 1)), revolution_arc=F2_T38_ANGLE, mode=Mode.SUBTRACT)

    # F2_s39 → F2_t40 (revolve, cut)
    with BuildSketch(Plane(origin=(0, 0, 0), x_dir=(0, 0, 1), z_dir=(0.1904337338, -0.9817000525, 0))):
        with BuildLine():
            ThreePointArc((6.4, -16), (7.8142135624, -15.4142135624), (8.4, -14))
            Line((8.4, -14), (8.4, -16))
            Line((8.4, -16), (6.4, -16))
        make_face()
    revolve(axis=Axis((0, 0, 8.4), (0, 0, 1)), revolution_arc=F2_T40_ANGLE, mode=Mode.SUBTRACT)

    # F2_s41 → F2_t42 (revolve, cut)
    with BuildSketch(Plane(origin=(0, 0, 0), x_dir=(0, 0, 1), z_dir=(0.7549603175, -0.6557704774, 0))):
        with BuildLine():
            ThreePointArc((2, -16), (0.5857864376, -15.4142135624), (0, -14))
            Line((0, -14), (0, -16))
            Line((0, -16), (2, -16))
        make_face()
    revolve(axis=Axis((13.7711800259, 15.8541666667, 0), (0, 0, -1)), revolution_arc=F2_T42_ANGLE, mode=Mode.SUBTRACT)

    # F2_s43 → F2_t44 (revolve, cut)
    with BuildSketch(Plane(origin=(0, 0, 0), x_dir=(0, 0, 1), z_dir=(0.7549603175, -0.6557704774, 0))):
        with BuildLine():
            ThreePointArc((6.4, -16), (7.8142135624, -15.4142135624), (8.4, -14))
            Line((8.4, -14), (8.4, -16))
            Line((8.4, -16), (6.4, -16))
        make_face()
    revolve(axis=Axis((13.7711800259, 15.8541666667, 8.4), (0, 0, -1)), revolution_arc=F2_T44_ANGLE, mode=Mode.SUBTRACT)

    # F2_s45 → F2_t46 (revolve, cut)
    with BuildSketch(Plane(origin=(-10.5166628713, 17.7792561849, 0), x_dir=(0, 0, 1), z_dir=(-0.5091145833, 0.8606987516, 0))):
        with BuildLine():
            ThreePointArc((2, 1.21875), (0.5857864376, 1.8045364376), (0, 3.21875))
            Line((0, 3.21875), (0, 1.21875))
            Line((0, 1.21875), (2, 1.21875))
        make_face()
    revolve(axis=Axis((-13.7711800259, 15.8541666667, 0), (0, 0, -1)), revolution_arc=F2_T46_ANGLE, mode=Mode.SUBTRACT)

    # F2_s47 → F2_t48 (revolve, cut)
    with BuildSketch(Plane(origin=(-10.5166628713, 17.7792561849, 0), x_dir=(0, 0, 1), z_dir=(-0.5091145833, 0.8606987516, 0))):
        with BuildLine():
            ThreePointArc((6.4, 1.21875), (7.8142135624, 1.8045364376), (8.4, 3.21875))
            Line((8.4, 3.21875), (8.4, 1.21875))
            Line((8.4, 1.21875), (6.4, 1.21875))
        make_face()
    revolve(axis=Axis((-13.7711800259, 15.8541666667, 8.4), (0, 0, -1)), revolution_arc=F2_T48_ANGLE, mode=Mode.SUBTRACT)


solid = f1.part
